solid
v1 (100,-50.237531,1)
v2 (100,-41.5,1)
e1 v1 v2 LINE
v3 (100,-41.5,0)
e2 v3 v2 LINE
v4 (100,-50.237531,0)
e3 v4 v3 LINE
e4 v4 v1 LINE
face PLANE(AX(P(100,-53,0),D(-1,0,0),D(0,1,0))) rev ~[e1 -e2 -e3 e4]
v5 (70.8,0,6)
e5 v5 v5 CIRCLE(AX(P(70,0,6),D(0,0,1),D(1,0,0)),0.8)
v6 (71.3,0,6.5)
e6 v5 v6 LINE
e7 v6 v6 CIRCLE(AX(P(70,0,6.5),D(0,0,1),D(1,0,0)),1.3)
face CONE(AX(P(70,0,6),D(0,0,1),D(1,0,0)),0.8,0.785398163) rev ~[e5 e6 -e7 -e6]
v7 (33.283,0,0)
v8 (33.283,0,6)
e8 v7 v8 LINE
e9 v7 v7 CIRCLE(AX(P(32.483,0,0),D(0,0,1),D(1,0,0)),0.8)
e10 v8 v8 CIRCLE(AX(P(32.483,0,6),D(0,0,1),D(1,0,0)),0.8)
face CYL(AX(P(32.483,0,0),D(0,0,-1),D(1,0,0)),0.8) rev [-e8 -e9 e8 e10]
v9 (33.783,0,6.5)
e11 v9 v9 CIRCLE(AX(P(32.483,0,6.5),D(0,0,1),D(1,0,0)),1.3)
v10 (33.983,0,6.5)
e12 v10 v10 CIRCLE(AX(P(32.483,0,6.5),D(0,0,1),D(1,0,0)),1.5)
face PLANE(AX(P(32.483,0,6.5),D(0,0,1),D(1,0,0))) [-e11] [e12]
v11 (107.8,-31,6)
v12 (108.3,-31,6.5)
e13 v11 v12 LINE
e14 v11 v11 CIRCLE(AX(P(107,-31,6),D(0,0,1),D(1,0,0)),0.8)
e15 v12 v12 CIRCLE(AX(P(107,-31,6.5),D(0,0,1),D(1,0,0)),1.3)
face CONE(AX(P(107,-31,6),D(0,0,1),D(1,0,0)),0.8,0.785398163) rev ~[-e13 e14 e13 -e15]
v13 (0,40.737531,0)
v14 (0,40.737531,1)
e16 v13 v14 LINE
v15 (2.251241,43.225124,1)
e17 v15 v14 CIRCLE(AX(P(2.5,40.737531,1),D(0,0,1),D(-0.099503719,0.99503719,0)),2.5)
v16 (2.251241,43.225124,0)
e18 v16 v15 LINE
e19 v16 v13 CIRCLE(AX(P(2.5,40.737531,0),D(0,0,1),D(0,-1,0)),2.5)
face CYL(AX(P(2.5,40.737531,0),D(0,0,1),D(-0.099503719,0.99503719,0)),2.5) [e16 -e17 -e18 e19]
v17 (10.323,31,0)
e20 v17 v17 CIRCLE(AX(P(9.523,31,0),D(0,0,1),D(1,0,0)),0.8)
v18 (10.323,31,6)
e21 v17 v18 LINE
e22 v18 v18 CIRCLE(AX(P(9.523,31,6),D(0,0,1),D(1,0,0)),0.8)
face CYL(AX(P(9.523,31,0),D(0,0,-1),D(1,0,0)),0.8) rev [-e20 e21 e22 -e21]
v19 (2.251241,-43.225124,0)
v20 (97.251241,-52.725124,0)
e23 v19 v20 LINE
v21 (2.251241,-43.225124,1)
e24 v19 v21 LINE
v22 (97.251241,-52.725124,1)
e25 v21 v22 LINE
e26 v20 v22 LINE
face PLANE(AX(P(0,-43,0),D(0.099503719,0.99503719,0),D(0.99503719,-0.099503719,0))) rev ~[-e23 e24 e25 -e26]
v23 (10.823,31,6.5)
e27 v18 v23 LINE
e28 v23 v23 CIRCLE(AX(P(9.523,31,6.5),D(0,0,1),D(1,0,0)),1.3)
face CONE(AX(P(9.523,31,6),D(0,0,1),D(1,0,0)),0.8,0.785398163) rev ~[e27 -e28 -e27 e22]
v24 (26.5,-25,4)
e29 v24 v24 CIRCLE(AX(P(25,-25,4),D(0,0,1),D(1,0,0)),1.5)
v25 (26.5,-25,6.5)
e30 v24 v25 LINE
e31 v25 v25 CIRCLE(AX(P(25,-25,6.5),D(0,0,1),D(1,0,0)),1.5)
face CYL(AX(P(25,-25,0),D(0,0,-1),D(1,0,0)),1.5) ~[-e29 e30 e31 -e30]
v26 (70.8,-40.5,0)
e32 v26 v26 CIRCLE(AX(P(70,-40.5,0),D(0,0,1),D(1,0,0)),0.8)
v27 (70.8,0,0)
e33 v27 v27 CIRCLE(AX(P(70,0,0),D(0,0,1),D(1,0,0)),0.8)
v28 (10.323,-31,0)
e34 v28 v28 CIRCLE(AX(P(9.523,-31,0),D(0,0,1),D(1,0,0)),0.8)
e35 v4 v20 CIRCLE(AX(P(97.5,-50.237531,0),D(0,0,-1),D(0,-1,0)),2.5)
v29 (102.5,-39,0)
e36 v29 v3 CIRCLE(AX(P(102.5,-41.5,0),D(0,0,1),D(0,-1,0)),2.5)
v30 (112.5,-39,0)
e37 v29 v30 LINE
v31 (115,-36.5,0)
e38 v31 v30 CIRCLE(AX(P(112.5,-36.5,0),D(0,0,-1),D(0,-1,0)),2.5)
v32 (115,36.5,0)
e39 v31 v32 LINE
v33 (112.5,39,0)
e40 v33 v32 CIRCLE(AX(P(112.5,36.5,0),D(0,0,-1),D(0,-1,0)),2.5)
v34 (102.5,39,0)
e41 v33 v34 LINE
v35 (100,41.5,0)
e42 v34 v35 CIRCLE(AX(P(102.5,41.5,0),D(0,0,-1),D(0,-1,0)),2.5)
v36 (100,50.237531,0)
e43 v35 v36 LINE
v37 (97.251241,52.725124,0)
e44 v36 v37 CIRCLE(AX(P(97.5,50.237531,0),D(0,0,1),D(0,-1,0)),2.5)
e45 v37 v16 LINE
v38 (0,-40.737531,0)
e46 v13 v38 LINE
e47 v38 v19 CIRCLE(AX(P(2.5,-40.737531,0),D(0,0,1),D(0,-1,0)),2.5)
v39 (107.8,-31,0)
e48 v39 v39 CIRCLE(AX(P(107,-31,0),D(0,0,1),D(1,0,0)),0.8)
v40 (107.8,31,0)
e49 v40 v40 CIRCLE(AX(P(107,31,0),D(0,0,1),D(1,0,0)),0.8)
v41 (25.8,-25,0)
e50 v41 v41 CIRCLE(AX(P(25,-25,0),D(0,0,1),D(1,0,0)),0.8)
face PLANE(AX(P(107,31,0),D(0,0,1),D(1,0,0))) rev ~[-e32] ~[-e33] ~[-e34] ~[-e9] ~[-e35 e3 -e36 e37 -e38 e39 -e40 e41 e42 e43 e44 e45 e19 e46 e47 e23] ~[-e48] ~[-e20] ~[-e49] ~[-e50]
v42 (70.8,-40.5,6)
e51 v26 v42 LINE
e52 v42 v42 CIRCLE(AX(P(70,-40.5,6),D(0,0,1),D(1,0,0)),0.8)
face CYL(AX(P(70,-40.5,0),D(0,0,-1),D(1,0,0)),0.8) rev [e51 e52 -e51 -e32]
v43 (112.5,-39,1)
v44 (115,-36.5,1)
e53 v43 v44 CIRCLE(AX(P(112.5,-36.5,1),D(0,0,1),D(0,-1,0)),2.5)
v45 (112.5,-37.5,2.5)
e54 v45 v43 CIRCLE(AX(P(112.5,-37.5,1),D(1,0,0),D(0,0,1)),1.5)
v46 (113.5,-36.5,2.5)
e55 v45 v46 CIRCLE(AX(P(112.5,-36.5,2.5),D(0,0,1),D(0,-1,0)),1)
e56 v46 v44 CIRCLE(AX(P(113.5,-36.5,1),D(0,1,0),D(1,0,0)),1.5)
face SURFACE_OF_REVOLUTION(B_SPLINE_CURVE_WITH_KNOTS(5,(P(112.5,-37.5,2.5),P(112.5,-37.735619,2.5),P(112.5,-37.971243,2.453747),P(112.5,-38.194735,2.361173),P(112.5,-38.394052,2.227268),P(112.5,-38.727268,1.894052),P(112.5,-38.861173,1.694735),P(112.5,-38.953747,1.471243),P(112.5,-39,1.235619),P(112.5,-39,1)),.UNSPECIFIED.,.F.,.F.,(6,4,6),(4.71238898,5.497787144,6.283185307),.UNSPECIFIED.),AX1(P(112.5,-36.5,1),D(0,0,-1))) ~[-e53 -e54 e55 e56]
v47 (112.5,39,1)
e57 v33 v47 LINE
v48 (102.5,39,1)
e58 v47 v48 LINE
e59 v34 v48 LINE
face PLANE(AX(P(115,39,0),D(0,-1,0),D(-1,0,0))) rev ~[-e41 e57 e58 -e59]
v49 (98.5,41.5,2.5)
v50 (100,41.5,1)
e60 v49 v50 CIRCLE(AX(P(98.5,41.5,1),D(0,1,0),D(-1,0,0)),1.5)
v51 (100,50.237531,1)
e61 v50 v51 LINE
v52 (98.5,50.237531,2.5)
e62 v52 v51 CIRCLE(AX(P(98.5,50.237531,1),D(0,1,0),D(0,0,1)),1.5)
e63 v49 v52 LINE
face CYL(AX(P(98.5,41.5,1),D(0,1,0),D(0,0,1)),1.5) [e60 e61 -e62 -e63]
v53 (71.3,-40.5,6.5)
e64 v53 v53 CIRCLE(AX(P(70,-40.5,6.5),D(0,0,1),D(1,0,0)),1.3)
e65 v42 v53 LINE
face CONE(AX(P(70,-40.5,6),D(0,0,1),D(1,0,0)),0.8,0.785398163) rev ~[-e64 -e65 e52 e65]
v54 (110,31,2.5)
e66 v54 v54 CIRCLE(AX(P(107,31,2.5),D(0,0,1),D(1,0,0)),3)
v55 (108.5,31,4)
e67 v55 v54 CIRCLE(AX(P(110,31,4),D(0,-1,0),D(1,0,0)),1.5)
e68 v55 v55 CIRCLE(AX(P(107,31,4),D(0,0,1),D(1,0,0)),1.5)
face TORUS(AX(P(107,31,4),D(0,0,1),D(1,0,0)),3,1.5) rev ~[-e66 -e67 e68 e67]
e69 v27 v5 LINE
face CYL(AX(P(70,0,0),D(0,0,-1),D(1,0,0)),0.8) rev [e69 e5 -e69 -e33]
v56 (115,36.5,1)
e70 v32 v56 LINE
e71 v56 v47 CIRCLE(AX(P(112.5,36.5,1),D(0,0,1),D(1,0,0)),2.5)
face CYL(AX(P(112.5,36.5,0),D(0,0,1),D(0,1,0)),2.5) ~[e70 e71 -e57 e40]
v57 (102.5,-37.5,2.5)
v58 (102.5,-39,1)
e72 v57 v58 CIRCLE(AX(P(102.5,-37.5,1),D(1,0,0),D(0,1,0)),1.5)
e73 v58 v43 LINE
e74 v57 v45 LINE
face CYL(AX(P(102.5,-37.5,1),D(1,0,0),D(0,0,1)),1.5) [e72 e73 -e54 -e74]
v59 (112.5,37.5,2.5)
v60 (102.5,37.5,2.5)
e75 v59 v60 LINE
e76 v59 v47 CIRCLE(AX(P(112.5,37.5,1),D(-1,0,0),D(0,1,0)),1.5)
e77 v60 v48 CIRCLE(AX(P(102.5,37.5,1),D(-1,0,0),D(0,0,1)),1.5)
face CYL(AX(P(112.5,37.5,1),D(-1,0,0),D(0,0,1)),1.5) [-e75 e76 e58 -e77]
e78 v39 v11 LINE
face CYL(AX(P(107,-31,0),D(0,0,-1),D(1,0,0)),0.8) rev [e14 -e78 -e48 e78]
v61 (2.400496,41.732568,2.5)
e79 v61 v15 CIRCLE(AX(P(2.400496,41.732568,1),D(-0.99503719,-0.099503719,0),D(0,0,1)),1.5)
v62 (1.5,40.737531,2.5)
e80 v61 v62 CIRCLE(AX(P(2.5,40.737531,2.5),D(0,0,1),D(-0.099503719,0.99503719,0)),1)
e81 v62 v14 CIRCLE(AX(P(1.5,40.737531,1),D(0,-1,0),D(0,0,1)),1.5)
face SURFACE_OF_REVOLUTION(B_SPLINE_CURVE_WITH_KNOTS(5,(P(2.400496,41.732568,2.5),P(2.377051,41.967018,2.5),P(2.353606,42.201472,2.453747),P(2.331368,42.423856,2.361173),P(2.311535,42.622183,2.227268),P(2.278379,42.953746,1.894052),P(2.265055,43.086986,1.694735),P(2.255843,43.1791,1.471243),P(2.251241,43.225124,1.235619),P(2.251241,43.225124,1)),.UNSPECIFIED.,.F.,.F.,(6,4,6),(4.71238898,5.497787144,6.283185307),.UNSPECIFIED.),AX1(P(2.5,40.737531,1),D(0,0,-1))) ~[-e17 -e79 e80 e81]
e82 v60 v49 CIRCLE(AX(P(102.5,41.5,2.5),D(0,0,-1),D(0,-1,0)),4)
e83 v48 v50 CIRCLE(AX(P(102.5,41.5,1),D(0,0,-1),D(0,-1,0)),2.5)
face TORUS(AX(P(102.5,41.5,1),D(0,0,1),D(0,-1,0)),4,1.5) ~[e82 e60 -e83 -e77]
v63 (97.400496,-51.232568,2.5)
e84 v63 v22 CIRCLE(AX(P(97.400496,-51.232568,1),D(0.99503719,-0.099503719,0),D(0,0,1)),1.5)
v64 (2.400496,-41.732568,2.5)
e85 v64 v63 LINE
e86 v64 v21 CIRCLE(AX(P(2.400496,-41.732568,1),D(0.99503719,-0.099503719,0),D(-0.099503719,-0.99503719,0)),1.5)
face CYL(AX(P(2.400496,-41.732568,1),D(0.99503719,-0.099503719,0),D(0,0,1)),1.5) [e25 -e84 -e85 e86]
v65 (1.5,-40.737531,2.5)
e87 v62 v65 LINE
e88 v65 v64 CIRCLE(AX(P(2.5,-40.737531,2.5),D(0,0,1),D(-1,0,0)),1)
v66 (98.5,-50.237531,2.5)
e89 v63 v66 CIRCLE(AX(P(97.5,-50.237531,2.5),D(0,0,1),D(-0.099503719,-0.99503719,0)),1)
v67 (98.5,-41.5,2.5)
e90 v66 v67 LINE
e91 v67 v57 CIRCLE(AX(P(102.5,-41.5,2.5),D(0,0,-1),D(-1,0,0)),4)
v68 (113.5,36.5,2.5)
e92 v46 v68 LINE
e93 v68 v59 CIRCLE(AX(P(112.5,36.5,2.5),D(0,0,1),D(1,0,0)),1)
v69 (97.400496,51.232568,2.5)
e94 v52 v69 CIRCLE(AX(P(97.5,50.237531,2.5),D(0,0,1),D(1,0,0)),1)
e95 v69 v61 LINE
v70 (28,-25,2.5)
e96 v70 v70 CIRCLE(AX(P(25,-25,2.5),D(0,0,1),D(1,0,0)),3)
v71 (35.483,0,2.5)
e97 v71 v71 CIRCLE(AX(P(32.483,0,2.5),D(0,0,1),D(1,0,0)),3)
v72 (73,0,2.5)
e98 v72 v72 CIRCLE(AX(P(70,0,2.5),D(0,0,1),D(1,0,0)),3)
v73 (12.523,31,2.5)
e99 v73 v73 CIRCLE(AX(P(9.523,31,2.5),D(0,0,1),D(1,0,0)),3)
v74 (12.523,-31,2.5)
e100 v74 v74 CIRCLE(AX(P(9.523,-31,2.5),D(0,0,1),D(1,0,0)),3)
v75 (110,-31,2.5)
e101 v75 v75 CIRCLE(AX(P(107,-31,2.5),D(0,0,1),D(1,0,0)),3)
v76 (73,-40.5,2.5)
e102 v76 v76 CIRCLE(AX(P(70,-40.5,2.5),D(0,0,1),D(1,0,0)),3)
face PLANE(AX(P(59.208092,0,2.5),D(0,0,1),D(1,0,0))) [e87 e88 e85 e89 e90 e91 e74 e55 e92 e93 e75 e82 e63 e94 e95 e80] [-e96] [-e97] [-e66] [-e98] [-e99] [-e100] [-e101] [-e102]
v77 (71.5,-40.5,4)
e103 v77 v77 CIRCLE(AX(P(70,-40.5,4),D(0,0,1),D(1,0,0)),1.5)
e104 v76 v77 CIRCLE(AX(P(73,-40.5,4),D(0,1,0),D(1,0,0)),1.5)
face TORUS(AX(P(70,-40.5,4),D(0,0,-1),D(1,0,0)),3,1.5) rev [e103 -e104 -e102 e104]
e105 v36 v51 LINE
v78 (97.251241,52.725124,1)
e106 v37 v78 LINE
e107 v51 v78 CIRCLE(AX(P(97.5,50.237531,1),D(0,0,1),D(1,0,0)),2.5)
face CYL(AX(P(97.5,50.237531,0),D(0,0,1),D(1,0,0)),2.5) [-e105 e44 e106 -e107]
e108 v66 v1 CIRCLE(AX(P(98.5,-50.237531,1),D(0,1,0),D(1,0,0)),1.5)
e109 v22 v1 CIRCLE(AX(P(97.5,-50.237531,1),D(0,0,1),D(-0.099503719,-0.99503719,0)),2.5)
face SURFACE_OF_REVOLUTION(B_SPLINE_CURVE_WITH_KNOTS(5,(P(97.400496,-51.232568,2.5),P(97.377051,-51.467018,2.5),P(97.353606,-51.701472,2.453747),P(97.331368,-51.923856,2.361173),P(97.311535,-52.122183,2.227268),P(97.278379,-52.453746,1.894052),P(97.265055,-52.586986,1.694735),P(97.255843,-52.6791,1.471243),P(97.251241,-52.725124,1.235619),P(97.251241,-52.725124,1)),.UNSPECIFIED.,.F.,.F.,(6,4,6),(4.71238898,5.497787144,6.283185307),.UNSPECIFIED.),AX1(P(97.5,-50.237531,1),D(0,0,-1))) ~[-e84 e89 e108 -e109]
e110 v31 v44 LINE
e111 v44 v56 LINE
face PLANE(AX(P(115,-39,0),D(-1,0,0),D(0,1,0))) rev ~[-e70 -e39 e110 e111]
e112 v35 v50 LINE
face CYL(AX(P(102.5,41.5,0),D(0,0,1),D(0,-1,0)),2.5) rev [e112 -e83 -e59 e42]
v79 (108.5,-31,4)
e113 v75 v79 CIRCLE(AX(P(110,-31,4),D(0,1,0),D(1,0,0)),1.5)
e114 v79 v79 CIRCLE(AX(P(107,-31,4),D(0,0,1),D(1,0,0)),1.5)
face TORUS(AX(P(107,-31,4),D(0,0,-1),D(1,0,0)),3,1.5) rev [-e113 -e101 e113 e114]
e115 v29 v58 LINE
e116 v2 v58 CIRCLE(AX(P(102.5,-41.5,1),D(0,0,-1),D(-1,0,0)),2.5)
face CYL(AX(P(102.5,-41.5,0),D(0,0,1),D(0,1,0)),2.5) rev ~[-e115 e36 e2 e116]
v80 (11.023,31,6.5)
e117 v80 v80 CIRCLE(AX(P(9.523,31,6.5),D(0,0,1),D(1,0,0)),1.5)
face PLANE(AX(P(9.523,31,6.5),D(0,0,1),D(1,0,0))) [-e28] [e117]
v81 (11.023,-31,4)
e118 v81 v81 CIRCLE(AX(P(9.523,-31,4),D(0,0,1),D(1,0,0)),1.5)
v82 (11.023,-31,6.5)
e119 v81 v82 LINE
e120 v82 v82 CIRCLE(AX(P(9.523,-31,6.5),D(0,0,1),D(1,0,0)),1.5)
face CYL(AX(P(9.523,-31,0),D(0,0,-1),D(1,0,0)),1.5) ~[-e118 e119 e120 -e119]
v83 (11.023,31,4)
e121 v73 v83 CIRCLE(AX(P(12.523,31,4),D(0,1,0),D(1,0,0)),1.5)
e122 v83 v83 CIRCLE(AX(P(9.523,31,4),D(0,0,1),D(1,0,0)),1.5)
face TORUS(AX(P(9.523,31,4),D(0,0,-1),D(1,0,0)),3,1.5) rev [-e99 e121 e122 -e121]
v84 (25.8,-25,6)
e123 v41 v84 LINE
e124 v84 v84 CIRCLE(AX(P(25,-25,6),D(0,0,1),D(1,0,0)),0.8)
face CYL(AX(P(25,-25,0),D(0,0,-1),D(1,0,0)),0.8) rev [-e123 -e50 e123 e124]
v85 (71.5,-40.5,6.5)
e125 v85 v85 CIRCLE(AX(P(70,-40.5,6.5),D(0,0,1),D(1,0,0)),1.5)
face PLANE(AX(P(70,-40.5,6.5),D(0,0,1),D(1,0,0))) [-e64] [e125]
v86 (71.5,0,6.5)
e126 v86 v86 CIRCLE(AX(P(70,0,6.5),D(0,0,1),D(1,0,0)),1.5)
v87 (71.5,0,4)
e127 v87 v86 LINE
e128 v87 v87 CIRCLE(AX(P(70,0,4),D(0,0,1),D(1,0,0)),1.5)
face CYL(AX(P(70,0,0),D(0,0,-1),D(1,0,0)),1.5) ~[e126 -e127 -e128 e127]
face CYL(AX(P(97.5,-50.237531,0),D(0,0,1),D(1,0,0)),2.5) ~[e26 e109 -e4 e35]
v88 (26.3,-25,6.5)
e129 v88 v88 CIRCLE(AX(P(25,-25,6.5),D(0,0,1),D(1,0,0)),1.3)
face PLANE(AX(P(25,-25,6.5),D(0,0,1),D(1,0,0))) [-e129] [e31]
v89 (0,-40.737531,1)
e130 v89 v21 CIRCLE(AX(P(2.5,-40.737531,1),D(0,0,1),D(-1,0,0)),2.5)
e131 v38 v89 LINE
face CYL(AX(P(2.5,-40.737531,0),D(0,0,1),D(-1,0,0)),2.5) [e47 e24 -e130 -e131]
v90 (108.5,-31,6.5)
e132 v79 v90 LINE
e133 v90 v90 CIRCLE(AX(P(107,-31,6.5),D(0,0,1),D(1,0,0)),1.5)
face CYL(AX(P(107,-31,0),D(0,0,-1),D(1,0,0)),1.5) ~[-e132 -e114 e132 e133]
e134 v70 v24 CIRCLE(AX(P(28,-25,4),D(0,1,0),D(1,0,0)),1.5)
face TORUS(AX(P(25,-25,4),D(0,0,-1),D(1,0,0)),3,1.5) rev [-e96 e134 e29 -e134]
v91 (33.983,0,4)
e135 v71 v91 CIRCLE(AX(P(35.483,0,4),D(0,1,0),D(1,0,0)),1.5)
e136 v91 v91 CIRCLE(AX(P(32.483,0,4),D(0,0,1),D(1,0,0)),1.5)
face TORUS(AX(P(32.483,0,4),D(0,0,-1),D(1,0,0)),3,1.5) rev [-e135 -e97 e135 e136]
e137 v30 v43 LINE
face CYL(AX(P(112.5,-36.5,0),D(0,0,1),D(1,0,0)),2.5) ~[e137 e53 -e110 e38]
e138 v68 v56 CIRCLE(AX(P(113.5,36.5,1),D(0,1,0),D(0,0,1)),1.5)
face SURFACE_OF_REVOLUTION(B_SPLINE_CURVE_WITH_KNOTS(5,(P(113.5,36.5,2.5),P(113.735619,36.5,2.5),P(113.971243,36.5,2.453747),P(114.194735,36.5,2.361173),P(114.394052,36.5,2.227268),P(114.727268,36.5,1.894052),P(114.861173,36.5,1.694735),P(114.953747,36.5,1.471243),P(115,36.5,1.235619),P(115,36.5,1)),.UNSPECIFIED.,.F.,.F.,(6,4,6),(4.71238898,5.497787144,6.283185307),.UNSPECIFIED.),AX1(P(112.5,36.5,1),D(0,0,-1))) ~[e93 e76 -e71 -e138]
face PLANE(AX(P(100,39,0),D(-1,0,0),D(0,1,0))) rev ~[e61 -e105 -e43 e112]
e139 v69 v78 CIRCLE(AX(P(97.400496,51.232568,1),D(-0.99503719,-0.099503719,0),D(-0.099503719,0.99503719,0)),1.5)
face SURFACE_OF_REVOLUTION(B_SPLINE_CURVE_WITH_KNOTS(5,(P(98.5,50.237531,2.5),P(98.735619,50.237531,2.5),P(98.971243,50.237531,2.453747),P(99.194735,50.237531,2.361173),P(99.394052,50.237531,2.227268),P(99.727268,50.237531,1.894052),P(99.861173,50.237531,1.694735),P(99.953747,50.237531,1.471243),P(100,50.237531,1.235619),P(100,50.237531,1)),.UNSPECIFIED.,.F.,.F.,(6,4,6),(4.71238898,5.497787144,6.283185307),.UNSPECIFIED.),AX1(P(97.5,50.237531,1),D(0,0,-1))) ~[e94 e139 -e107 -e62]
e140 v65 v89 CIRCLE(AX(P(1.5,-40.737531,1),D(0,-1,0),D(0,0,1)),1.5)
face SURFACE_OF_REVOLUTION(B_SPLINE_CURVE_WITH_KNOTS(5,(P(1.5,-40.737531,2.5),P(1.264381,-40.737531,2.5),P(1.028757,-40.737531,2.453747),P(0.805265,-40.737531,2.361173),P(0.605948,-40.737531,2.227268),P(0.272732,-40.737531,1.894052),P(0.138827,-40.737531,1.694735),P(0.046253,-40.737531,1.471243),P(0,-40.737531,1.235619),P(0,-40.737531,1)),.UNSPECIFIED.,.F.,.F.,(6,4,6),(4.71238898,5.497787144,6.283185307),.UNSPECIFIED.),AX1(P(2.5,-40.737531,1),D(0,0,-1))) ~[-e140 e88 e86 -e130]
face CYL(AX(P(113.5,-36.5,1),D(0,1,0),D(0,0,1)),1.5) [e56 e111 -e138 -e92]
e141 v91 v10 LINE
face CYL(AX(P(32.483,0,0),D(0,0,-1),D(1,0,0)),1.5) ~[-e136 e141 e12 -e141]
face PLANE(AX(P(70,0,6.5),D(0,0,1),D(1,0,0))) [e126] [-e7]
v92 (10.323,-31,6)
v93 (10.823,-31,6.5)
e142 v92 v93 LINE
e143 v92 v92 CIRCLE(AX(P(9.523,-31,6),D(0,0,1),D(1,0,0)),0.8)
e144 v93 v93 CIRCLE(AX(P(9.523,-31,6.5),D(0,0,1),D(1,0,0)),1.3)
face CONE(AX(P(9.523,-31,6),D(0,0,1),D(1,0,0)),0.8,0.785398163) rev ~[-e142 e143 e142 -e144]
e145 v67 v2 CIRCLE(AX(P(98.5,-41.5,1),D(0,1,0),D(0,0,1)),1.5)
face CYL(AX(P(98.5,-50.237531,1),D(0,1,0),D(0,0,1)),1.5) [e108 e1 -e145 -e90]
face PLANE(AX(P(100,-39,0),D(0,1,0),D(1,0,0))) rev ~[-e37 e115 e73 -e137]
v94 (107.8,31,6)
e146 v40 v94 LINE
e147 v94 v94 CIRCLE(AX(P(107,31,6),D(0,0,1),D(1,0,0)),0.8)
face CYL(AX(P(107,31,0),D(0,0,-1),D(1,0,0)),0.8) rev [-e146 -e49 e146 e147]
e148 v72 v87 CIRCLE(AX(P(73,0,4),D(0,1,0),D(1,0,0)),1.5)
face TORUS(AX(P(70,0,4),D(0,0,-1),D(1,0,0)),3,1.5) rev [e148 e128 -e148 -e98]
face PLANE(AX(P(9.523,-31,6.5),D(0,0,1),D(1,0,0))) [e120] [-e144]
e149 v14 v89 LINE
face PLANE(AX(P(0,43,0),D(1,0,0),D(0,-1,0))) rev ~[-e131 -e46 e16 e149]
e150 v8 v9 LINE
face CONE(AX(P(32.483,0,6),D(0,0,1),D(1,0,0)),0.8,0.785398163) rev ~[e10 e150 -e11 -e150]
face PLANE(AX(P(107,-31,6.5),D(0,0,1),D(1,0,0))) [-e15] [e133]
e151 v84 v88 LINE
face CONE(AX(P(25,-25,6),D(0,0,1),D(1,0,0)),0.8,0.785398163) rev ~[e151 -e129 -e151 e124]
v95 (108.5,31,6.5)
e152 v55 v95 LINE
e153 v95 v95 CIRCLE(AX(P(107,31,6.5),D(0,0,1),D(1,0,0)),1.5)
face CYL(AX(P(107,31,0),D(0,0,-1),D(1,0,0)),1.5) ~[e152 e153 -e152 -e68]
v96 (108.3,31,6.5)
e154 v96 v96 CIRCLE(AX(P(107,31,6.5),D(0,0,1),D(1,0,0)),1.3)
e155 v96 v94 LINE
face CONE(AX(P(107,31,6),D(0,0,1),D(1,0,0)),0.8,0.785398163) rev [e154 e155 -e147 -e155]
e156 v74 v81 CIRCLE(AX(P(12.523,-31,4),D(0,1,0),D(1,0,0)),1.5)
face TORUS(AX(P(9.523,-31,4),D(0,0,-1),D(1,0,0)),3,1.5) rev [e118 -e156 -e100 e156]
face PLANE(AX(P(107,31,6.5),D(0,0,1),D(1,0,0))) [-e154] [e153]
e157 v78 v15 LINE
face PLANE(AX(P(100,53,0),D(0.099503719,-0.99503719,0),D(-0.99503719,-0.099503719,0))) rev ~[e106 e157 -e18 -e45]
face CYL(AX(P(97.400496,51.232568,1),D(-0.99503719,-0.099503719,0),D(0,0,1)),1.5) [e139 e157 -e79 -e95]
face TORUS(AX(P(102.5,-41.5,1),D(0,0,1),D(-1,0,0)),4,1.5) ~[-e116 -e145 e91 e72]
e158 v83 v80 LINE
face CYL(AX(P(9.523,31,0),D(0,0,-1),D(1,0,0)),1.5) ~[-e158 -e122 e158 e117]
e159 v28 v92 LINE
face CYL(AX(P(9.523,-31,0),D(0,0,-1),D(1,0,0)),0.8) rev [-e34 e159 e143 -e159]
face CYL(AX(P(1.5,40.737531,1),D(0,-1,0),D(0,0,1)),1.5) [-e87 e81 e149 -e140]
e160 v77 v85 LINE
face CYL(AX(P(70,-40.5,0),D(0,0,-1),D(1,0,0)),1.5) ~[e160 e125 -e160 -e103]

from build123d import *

# Parameters (mm, degrees)
F0_R     = 1.5
F1_DEPTH = 2.5
F2_R     = 2.5
F3_R     = 1.5
F0_R_2   = 0.8
F4_DEPTH = 6.5
F5_R     = 1.5
F6_SIZE  = 0.5


# Not quite as in the source:
# - a feature names something its author has since deleted; it is built from what else it names


with BuildPart() as f1:
    # F0 (on Top) → F1 (new body)
    with BuildSketch(Plane.XY):
        Polygon((115, 39), (100, 39), (100, 53), (0, 43), (0, -43), (100, -53), (100, -39), (115, -39), align=None)
        with Locations((9.523, -31)):
            Circle(F0_R, mode=Mode.SUBTRACT)
        with Locations((25, -25)):
            Circle(F0_R, mode=Mode.SUBTRACT)
        with Locations((70, -40.5)):
            Circle(F0_R, mode=Mode.SUBTRACT)
        with Locations((107, -31)):
            Circle(F0_R, mode=Mode.SUBTRACT)
        with Locations((32.483, 0)):
            Circle(F0_R, mode=Mode.SUBTRACT)
        with Locations((9.523, 31)):
            Circle(F0_R, mode=Mode.SUBTRACT)
        with Locations((70, 0)):
            Circle(F0_R, mode=Mode.SUBTRACT)
        with Locations((107, 31)):
            Circle(F0_R, mode=Mode.SUBTRACT)
    extrude(amount=F1_DEPTH)

    # F2
    f2_edges = [f1.edges().sort_by_distance(p)[0] for p in [
        (100, 39, 1.25),
        (100, 53, 1.25),
        (115, 39, 1.25),
        (0, 43, 1.25),
        (115, -39, 1.25),
        (100, -39, 1.25),
        (100, -53, 1.25),
        (0, -43, 1.25),
    ]]
    fillet(f2_edges, radius=F2_R)

    # F3
    f3_edges = [f1.edges().sort_by_distance(p)[0] for p in [
        (0, 0, 2.5),
        (115, 0, 2.5),
        (49.751241, 47.975124, 2.5),
        (49.751241, -47.975124, 2.5),
        (100, -45.868766, 2.5),
        (107.5, -39, 2.5),
        (107.5, 39, 2.5),
        (100, 45.868766, 2.5),
    ]]
    fillet(f3_edges, radius=F3_R)

    # F0 (on Top) → F4 (join)
    with BuildSketch(Plane.XY):
        with Locations((107, 31)):
            Circle(F0_R)
        with Locations((107, 31)):
            Circle(F0_R_2, mode=Mode.SUBTRACT)
        with Locations((70, 0)):
            Circle(F0_R)
        with Locations((70, 0)):
            Circle(F0_R_2, mode=Mode.SUBTRACT)
        with Locations((107, -31)):
            Circle(F0_R)
        with Locations((107, -31)):
            Circle(F0_R_2, mode=Mode.SUBTRACT)
        with Locations((70, -40.5)):
            Circle(F0_R)
        with Locations((70, -40.5)):
            Circle(F0_R_2, mode=Mode.SUBTRACT)
        with Locations((25, -25)):
            Circle(F0_R)
        with Locations((25, -25)):
            Circle(F0_R_2, mode=Mode.SUBTRACT)
        with Locations((9.523, -31)):
            Circle(F0_R)
        with Locations((9.523, -31)):
            Circle(F0_R_2, mode=Mode.SUBTRACT)
        with Locations((9.523, 31)):
            Circle(F0_R)
        with Locations((9.523, 31)):
            Circle(F0_R_2, mode=Mode.SUBTRACT)
        with Locations((32.483, 0)):
            Circle(F0_R)
        with Locations((32.483, 0)):
            Circle(F0_R_2, mode=Mode.SUBTRACT)
    extrude(amount=F4_DEPTH)

    # F5
    f5_edges = [f1.edges().sort_by_distance(p)[0] for p in [
        (68.5, 0, 2.5),
        (23.5, -25, 2.5),
        (8.023, -31, 2.5),
        (8.023, 31, 2.5),
        (68.5, -40.5, 2.5),
        (105.5, -31, 2.5),
        (105.5, 31, 2.5),
        (30.983, 0, 2.5),
    ]]
    fillet(f5_edges, radius=F5_R)

    # F6
    f6_edges = [f1.edges().sort_by_distance(p)[0] for p in [
        (106.2, 31, 6.5),
        (106.2, -31, 6.5),
        (69.2, -40.5, 6.5),
        (69.2, 0, 6.5),
        (8.723, 31, 6.5),
        (24.2, -25, 6.5),
        (8.723, -31, 6.5),
        (31.683, 0, 6.5),
    ]]
    chamfer(f6_edges, length=F6_SIZE)


solid = f1.part
